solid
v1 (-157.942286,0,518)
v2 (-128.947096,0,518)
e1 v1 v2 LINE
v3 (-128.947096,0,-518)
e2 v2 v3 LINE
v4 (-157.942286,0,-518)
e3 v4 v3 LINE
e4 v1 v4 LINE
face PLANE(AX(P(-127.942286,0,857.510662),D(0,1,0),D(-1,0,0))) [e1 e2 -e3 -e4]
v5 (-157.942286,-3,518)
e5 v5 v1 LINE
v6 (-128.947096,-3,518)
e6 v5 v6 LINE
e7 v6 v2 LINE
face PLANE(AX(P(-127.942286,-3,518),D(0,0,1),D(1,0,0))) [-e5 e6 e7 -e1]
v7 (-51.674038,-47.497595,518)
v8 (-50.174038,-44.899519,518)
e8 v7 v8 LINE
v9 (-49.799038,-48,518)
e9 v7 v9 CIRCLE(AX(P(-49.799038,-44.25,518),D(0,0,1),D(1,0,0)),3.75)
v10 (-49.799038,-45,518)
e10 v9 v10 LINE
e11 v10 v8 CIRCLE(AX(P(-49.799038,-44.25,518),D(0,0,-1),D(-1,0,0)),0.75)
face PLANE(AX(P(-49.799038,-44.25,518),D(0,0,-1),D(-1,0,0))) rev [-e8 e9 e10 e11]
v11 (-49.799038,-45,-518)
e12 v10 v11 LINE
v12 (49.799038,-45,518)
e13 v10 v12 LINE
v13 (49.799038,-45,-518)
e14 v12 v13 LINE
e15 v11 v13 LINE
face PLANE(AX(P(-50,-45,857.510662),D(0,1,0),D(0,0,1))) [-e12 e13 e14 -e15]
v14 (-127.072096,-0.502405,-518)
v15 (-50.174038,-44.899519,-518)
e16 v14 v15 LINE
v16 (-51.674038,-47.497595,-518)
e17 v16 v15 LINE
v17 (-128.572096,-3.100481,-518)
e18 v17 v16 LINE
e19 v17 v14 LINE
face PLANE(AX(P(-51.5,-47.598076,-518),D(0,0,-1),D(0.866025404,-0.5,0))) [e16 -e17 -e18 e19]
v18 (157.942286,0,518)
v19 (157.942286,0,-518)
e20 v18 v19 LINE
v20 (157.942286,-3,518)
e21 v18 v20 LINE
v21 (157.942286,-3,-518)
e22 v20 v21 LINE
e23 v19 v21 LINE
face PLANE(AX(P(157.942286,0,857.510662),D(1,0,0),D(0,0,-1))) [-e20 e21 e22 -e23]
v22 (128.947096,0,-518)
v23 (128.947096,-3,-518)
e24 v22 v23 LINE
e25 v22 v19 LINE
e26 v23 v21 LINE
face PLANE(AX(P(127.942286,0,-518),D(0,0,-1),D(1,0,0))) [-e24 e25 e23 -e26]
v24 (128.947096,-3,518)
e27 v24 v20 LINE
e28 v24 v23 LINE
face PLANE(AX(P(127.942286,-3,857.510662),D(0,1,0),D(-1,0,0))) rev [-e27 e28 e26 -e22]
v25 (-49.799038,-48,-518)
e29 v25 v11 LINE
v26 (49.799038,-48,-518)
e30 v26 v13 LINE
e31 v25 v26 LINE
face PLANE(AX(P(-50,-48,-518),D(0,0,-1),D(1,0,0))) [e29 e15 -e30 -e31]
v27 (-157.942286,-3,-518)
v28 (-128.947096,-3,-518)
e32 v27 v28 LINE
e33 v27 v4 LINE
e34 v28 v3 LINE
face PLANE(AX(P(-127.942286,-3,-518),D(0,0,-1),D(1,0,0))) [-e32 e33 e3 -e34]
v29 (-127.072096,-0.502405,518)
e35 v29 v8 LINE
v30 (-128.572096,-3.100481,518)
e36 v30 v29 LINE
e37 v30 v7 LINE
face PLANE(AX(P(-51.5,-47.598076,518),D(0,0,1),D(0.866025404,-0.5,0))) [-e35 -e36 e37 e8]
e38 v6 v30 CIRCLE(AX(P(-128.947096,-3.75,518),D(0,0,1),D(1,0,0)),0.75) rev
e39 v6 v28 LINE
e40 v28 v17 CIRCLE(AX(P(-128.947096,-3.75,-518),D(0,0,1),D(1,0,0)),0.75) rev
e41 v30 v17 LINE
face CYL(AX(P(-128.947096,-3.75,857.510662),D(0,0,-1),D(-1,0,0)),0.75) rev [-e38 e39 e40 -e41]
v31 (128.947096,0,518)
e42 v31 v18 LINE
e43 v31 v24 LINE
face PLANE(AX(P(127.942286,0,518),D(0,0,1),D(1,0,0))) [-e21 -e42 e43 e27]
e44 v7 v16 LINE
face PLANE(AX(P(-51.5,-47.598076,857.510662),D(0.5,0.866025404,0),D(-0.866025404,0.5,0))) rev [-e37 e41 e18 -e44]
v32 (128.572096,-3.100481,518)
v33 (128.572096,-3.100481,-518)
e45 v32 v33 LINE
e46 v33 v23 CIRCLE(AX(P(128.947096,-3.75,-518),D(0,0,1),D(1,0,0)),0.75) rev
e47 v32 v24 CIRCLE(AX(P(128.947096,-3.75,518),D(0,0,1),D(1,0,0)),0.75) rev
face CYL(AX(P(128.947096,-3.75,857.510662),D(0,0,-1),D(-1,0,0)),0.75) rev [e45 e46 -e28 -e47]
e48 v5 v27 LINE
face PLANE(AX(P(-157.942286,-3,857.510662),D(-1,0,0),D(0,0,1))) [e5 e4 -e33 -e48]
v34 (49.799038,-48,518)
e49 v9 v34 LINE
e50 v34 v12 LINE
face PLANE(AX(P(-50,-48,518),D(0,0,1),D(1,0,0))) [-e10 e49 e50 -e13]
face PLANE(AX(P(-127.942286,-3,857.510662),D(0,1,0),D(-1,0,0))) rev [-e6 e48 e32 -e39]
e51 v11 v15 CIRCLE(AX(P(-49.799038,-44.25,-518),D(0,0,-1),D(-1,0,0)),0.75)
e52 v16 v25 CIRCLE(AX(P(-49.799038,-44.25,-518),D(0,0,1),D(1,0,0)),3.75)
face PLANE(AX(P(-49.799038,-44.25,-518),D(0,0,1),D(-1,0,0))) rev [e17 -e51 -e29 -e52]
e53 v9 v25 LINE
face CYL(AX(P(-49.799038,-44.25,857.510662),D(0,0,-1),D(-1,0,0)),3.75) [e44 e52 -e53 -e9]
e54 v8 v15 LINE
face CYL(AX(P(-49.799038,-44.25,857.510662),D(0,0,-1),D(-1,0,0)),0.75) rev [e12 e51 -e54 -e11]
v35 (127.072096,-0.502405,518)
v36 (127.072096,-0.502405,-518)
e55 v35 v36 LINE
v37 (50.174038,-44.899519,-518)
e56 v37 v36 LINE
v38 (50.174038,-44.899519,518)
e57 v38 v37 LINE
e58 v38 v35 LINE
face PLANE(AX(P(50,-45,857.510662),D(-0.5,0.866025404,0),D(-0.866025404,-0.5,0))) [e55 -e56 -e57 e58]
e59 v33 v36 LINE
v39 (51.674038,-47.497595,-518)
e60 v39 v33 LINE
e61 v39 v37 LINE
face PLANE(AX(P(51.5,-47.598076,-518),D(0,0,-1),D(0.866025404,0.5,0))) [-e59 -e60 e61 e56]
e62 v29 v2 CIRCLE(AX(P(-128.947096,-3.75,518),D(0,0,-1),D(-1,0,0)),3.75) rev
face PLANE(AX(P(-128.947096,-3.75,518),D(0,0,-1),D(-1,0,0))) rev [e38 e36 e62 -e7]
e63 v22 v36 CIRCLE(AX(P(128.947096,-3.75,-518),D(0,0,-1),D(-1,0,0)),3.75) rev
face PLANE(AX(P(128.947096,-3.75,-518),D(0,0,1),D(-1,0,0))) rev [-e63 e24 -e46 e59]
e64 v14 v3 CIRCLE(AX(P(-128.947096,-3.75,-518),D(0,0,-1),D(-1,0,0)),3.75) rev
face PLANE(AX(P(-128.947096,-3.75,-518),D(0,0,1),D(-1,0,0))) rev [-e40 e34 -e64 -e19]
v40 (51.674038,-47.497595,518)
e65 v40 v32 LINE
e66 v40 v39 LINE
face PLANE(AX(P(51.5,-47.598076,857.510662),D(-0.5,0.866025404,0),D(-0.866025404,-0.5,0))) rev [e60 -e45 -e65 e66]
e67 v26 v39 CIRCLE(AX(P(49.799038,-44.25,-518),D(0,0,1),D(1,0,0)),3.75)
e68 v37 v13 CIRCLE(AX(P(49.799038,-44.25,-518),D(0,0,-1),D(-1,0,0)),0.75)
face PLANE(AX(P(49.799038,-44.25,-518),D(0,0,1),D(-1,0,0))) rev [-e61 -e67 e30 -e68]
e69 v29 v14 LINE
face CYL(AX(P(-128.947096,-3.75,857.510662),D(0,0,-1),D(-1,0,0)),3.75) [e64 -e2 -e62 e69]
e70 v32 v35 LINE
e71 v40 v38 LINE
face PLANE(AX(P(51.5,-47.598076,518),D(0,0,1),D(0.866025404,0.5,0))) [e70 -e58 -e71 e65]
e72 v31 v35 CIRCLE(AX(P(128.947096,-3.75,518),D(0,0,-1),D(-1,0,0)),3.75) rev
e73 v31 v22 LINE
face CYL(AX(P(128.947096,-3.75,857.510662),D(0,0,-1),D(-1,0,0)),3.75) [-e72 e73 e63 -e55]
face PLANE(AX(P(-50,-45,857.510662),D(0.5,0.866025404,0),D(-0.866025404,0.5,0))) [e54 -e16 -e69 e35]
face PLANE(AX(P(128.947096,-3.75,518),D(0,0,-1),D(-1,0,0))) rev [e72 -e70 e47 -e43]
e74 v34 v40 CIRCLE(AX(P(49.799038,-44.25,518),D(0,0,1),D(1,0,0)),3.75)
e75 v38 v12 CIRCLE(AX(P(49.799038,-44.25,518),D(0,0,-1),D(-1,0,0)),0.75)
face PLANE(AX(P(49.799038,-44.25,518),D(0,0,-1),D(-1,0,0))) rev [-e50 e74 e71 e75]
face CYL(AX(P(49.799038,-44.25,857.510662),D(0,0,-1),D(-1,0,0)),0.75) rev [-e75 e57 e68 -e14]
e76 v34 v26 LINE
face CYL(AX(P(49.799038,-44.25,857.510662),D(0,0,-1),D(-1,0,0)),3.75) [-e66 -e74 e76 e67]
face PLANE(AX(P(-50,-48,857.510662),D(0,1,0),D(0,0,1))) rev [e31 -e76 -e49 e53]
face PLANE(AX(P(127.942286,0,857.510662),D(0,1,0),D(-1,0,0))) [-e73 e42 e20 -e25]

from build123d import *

# Parameters (mm, degrees)
SM_BASE_FLANGE_1_DEPTH = 518


# Sheet-metal steps are written as plain solids
with BuildPart() as part:
    # Sketch 1 → Базовая кромка1 (new body)
    with BuildSketch(Plane.XY):
        with BuildLine():
            Line((-157.942286341, 0), (-128.947095812, 0))
            ThreePointArc((-128.947095812, 0), (-127.976524393, -0.127778151), (-127.072095812, -0.502404736))
            Line((-127.072095812, -0.502404736), (-50.174038106, -44.899519053))
            ThreePointArc((-50.174038106, -44.899519053), (-49.99315239, -44.97444437), (-49.799038106, -45))
            Line((-49.799038106, -45), (49.799038106, -45))
            ThreePointArc((49.799038106, -45), (49.99315239, -44.97444437), (50.174038106, -44.899519053))
            Line((50.174038106, -44.899519053), (127.072095812, -0.502404736))
            ThreePointArc((127.072095812, -0.502404736), (127.976524393, -0.127778151), (128.947095812, 0))
            Line((128.947095812, 0), (157.942286341, 0))
            Line((157.942286341, 0), (157.942286341, -3))
            Line((157.942286341, -3), (128.947095812, -3))
            ThreePointArc((128.947095812, -3), (128.752981528, -3.02555563), (128.572095812, -3.100480947))
            Line((128.572095812, -3.100480947), (51.674038106, -47.497595264))
            ThreePointArc((51.674038106, -47.497595264), (50.769609525, -47.872221849), (49.799038106, -48))
            Line((49.799038106, -48), (-49.799038106, -48))
            ThreePointArc((-49.799038106, -48), (-50.769609525, -47.872221849), (-51.674038106, -47.497595264))
            Line((-51.674038106, -47.497595264), (-128.572095812, -3.100480947))
            ThreePointArc((-128.572095812, -3.100480947), (-128.752981528, -3.02555563), (-128.947095812, -3))
            Line((-128.947095812, -3), (-157.942286341, -3))
            Line((-157.942286341, -3), (-157.942286341, 0))
        make_face()
    extrude(amount=SM_BASE_FLANGE_1_DEPTH)

    # Зеркальное отражение1: part across plane


with BuildPart() as part_1:
    add(part.part)
    add(part.part.mirror(Plane(origin=(51.674038106, -47.497595264, 0), x_dir=(1, 0, 0), z_dir=(0, 0, -1))))


solid = part_1.part
